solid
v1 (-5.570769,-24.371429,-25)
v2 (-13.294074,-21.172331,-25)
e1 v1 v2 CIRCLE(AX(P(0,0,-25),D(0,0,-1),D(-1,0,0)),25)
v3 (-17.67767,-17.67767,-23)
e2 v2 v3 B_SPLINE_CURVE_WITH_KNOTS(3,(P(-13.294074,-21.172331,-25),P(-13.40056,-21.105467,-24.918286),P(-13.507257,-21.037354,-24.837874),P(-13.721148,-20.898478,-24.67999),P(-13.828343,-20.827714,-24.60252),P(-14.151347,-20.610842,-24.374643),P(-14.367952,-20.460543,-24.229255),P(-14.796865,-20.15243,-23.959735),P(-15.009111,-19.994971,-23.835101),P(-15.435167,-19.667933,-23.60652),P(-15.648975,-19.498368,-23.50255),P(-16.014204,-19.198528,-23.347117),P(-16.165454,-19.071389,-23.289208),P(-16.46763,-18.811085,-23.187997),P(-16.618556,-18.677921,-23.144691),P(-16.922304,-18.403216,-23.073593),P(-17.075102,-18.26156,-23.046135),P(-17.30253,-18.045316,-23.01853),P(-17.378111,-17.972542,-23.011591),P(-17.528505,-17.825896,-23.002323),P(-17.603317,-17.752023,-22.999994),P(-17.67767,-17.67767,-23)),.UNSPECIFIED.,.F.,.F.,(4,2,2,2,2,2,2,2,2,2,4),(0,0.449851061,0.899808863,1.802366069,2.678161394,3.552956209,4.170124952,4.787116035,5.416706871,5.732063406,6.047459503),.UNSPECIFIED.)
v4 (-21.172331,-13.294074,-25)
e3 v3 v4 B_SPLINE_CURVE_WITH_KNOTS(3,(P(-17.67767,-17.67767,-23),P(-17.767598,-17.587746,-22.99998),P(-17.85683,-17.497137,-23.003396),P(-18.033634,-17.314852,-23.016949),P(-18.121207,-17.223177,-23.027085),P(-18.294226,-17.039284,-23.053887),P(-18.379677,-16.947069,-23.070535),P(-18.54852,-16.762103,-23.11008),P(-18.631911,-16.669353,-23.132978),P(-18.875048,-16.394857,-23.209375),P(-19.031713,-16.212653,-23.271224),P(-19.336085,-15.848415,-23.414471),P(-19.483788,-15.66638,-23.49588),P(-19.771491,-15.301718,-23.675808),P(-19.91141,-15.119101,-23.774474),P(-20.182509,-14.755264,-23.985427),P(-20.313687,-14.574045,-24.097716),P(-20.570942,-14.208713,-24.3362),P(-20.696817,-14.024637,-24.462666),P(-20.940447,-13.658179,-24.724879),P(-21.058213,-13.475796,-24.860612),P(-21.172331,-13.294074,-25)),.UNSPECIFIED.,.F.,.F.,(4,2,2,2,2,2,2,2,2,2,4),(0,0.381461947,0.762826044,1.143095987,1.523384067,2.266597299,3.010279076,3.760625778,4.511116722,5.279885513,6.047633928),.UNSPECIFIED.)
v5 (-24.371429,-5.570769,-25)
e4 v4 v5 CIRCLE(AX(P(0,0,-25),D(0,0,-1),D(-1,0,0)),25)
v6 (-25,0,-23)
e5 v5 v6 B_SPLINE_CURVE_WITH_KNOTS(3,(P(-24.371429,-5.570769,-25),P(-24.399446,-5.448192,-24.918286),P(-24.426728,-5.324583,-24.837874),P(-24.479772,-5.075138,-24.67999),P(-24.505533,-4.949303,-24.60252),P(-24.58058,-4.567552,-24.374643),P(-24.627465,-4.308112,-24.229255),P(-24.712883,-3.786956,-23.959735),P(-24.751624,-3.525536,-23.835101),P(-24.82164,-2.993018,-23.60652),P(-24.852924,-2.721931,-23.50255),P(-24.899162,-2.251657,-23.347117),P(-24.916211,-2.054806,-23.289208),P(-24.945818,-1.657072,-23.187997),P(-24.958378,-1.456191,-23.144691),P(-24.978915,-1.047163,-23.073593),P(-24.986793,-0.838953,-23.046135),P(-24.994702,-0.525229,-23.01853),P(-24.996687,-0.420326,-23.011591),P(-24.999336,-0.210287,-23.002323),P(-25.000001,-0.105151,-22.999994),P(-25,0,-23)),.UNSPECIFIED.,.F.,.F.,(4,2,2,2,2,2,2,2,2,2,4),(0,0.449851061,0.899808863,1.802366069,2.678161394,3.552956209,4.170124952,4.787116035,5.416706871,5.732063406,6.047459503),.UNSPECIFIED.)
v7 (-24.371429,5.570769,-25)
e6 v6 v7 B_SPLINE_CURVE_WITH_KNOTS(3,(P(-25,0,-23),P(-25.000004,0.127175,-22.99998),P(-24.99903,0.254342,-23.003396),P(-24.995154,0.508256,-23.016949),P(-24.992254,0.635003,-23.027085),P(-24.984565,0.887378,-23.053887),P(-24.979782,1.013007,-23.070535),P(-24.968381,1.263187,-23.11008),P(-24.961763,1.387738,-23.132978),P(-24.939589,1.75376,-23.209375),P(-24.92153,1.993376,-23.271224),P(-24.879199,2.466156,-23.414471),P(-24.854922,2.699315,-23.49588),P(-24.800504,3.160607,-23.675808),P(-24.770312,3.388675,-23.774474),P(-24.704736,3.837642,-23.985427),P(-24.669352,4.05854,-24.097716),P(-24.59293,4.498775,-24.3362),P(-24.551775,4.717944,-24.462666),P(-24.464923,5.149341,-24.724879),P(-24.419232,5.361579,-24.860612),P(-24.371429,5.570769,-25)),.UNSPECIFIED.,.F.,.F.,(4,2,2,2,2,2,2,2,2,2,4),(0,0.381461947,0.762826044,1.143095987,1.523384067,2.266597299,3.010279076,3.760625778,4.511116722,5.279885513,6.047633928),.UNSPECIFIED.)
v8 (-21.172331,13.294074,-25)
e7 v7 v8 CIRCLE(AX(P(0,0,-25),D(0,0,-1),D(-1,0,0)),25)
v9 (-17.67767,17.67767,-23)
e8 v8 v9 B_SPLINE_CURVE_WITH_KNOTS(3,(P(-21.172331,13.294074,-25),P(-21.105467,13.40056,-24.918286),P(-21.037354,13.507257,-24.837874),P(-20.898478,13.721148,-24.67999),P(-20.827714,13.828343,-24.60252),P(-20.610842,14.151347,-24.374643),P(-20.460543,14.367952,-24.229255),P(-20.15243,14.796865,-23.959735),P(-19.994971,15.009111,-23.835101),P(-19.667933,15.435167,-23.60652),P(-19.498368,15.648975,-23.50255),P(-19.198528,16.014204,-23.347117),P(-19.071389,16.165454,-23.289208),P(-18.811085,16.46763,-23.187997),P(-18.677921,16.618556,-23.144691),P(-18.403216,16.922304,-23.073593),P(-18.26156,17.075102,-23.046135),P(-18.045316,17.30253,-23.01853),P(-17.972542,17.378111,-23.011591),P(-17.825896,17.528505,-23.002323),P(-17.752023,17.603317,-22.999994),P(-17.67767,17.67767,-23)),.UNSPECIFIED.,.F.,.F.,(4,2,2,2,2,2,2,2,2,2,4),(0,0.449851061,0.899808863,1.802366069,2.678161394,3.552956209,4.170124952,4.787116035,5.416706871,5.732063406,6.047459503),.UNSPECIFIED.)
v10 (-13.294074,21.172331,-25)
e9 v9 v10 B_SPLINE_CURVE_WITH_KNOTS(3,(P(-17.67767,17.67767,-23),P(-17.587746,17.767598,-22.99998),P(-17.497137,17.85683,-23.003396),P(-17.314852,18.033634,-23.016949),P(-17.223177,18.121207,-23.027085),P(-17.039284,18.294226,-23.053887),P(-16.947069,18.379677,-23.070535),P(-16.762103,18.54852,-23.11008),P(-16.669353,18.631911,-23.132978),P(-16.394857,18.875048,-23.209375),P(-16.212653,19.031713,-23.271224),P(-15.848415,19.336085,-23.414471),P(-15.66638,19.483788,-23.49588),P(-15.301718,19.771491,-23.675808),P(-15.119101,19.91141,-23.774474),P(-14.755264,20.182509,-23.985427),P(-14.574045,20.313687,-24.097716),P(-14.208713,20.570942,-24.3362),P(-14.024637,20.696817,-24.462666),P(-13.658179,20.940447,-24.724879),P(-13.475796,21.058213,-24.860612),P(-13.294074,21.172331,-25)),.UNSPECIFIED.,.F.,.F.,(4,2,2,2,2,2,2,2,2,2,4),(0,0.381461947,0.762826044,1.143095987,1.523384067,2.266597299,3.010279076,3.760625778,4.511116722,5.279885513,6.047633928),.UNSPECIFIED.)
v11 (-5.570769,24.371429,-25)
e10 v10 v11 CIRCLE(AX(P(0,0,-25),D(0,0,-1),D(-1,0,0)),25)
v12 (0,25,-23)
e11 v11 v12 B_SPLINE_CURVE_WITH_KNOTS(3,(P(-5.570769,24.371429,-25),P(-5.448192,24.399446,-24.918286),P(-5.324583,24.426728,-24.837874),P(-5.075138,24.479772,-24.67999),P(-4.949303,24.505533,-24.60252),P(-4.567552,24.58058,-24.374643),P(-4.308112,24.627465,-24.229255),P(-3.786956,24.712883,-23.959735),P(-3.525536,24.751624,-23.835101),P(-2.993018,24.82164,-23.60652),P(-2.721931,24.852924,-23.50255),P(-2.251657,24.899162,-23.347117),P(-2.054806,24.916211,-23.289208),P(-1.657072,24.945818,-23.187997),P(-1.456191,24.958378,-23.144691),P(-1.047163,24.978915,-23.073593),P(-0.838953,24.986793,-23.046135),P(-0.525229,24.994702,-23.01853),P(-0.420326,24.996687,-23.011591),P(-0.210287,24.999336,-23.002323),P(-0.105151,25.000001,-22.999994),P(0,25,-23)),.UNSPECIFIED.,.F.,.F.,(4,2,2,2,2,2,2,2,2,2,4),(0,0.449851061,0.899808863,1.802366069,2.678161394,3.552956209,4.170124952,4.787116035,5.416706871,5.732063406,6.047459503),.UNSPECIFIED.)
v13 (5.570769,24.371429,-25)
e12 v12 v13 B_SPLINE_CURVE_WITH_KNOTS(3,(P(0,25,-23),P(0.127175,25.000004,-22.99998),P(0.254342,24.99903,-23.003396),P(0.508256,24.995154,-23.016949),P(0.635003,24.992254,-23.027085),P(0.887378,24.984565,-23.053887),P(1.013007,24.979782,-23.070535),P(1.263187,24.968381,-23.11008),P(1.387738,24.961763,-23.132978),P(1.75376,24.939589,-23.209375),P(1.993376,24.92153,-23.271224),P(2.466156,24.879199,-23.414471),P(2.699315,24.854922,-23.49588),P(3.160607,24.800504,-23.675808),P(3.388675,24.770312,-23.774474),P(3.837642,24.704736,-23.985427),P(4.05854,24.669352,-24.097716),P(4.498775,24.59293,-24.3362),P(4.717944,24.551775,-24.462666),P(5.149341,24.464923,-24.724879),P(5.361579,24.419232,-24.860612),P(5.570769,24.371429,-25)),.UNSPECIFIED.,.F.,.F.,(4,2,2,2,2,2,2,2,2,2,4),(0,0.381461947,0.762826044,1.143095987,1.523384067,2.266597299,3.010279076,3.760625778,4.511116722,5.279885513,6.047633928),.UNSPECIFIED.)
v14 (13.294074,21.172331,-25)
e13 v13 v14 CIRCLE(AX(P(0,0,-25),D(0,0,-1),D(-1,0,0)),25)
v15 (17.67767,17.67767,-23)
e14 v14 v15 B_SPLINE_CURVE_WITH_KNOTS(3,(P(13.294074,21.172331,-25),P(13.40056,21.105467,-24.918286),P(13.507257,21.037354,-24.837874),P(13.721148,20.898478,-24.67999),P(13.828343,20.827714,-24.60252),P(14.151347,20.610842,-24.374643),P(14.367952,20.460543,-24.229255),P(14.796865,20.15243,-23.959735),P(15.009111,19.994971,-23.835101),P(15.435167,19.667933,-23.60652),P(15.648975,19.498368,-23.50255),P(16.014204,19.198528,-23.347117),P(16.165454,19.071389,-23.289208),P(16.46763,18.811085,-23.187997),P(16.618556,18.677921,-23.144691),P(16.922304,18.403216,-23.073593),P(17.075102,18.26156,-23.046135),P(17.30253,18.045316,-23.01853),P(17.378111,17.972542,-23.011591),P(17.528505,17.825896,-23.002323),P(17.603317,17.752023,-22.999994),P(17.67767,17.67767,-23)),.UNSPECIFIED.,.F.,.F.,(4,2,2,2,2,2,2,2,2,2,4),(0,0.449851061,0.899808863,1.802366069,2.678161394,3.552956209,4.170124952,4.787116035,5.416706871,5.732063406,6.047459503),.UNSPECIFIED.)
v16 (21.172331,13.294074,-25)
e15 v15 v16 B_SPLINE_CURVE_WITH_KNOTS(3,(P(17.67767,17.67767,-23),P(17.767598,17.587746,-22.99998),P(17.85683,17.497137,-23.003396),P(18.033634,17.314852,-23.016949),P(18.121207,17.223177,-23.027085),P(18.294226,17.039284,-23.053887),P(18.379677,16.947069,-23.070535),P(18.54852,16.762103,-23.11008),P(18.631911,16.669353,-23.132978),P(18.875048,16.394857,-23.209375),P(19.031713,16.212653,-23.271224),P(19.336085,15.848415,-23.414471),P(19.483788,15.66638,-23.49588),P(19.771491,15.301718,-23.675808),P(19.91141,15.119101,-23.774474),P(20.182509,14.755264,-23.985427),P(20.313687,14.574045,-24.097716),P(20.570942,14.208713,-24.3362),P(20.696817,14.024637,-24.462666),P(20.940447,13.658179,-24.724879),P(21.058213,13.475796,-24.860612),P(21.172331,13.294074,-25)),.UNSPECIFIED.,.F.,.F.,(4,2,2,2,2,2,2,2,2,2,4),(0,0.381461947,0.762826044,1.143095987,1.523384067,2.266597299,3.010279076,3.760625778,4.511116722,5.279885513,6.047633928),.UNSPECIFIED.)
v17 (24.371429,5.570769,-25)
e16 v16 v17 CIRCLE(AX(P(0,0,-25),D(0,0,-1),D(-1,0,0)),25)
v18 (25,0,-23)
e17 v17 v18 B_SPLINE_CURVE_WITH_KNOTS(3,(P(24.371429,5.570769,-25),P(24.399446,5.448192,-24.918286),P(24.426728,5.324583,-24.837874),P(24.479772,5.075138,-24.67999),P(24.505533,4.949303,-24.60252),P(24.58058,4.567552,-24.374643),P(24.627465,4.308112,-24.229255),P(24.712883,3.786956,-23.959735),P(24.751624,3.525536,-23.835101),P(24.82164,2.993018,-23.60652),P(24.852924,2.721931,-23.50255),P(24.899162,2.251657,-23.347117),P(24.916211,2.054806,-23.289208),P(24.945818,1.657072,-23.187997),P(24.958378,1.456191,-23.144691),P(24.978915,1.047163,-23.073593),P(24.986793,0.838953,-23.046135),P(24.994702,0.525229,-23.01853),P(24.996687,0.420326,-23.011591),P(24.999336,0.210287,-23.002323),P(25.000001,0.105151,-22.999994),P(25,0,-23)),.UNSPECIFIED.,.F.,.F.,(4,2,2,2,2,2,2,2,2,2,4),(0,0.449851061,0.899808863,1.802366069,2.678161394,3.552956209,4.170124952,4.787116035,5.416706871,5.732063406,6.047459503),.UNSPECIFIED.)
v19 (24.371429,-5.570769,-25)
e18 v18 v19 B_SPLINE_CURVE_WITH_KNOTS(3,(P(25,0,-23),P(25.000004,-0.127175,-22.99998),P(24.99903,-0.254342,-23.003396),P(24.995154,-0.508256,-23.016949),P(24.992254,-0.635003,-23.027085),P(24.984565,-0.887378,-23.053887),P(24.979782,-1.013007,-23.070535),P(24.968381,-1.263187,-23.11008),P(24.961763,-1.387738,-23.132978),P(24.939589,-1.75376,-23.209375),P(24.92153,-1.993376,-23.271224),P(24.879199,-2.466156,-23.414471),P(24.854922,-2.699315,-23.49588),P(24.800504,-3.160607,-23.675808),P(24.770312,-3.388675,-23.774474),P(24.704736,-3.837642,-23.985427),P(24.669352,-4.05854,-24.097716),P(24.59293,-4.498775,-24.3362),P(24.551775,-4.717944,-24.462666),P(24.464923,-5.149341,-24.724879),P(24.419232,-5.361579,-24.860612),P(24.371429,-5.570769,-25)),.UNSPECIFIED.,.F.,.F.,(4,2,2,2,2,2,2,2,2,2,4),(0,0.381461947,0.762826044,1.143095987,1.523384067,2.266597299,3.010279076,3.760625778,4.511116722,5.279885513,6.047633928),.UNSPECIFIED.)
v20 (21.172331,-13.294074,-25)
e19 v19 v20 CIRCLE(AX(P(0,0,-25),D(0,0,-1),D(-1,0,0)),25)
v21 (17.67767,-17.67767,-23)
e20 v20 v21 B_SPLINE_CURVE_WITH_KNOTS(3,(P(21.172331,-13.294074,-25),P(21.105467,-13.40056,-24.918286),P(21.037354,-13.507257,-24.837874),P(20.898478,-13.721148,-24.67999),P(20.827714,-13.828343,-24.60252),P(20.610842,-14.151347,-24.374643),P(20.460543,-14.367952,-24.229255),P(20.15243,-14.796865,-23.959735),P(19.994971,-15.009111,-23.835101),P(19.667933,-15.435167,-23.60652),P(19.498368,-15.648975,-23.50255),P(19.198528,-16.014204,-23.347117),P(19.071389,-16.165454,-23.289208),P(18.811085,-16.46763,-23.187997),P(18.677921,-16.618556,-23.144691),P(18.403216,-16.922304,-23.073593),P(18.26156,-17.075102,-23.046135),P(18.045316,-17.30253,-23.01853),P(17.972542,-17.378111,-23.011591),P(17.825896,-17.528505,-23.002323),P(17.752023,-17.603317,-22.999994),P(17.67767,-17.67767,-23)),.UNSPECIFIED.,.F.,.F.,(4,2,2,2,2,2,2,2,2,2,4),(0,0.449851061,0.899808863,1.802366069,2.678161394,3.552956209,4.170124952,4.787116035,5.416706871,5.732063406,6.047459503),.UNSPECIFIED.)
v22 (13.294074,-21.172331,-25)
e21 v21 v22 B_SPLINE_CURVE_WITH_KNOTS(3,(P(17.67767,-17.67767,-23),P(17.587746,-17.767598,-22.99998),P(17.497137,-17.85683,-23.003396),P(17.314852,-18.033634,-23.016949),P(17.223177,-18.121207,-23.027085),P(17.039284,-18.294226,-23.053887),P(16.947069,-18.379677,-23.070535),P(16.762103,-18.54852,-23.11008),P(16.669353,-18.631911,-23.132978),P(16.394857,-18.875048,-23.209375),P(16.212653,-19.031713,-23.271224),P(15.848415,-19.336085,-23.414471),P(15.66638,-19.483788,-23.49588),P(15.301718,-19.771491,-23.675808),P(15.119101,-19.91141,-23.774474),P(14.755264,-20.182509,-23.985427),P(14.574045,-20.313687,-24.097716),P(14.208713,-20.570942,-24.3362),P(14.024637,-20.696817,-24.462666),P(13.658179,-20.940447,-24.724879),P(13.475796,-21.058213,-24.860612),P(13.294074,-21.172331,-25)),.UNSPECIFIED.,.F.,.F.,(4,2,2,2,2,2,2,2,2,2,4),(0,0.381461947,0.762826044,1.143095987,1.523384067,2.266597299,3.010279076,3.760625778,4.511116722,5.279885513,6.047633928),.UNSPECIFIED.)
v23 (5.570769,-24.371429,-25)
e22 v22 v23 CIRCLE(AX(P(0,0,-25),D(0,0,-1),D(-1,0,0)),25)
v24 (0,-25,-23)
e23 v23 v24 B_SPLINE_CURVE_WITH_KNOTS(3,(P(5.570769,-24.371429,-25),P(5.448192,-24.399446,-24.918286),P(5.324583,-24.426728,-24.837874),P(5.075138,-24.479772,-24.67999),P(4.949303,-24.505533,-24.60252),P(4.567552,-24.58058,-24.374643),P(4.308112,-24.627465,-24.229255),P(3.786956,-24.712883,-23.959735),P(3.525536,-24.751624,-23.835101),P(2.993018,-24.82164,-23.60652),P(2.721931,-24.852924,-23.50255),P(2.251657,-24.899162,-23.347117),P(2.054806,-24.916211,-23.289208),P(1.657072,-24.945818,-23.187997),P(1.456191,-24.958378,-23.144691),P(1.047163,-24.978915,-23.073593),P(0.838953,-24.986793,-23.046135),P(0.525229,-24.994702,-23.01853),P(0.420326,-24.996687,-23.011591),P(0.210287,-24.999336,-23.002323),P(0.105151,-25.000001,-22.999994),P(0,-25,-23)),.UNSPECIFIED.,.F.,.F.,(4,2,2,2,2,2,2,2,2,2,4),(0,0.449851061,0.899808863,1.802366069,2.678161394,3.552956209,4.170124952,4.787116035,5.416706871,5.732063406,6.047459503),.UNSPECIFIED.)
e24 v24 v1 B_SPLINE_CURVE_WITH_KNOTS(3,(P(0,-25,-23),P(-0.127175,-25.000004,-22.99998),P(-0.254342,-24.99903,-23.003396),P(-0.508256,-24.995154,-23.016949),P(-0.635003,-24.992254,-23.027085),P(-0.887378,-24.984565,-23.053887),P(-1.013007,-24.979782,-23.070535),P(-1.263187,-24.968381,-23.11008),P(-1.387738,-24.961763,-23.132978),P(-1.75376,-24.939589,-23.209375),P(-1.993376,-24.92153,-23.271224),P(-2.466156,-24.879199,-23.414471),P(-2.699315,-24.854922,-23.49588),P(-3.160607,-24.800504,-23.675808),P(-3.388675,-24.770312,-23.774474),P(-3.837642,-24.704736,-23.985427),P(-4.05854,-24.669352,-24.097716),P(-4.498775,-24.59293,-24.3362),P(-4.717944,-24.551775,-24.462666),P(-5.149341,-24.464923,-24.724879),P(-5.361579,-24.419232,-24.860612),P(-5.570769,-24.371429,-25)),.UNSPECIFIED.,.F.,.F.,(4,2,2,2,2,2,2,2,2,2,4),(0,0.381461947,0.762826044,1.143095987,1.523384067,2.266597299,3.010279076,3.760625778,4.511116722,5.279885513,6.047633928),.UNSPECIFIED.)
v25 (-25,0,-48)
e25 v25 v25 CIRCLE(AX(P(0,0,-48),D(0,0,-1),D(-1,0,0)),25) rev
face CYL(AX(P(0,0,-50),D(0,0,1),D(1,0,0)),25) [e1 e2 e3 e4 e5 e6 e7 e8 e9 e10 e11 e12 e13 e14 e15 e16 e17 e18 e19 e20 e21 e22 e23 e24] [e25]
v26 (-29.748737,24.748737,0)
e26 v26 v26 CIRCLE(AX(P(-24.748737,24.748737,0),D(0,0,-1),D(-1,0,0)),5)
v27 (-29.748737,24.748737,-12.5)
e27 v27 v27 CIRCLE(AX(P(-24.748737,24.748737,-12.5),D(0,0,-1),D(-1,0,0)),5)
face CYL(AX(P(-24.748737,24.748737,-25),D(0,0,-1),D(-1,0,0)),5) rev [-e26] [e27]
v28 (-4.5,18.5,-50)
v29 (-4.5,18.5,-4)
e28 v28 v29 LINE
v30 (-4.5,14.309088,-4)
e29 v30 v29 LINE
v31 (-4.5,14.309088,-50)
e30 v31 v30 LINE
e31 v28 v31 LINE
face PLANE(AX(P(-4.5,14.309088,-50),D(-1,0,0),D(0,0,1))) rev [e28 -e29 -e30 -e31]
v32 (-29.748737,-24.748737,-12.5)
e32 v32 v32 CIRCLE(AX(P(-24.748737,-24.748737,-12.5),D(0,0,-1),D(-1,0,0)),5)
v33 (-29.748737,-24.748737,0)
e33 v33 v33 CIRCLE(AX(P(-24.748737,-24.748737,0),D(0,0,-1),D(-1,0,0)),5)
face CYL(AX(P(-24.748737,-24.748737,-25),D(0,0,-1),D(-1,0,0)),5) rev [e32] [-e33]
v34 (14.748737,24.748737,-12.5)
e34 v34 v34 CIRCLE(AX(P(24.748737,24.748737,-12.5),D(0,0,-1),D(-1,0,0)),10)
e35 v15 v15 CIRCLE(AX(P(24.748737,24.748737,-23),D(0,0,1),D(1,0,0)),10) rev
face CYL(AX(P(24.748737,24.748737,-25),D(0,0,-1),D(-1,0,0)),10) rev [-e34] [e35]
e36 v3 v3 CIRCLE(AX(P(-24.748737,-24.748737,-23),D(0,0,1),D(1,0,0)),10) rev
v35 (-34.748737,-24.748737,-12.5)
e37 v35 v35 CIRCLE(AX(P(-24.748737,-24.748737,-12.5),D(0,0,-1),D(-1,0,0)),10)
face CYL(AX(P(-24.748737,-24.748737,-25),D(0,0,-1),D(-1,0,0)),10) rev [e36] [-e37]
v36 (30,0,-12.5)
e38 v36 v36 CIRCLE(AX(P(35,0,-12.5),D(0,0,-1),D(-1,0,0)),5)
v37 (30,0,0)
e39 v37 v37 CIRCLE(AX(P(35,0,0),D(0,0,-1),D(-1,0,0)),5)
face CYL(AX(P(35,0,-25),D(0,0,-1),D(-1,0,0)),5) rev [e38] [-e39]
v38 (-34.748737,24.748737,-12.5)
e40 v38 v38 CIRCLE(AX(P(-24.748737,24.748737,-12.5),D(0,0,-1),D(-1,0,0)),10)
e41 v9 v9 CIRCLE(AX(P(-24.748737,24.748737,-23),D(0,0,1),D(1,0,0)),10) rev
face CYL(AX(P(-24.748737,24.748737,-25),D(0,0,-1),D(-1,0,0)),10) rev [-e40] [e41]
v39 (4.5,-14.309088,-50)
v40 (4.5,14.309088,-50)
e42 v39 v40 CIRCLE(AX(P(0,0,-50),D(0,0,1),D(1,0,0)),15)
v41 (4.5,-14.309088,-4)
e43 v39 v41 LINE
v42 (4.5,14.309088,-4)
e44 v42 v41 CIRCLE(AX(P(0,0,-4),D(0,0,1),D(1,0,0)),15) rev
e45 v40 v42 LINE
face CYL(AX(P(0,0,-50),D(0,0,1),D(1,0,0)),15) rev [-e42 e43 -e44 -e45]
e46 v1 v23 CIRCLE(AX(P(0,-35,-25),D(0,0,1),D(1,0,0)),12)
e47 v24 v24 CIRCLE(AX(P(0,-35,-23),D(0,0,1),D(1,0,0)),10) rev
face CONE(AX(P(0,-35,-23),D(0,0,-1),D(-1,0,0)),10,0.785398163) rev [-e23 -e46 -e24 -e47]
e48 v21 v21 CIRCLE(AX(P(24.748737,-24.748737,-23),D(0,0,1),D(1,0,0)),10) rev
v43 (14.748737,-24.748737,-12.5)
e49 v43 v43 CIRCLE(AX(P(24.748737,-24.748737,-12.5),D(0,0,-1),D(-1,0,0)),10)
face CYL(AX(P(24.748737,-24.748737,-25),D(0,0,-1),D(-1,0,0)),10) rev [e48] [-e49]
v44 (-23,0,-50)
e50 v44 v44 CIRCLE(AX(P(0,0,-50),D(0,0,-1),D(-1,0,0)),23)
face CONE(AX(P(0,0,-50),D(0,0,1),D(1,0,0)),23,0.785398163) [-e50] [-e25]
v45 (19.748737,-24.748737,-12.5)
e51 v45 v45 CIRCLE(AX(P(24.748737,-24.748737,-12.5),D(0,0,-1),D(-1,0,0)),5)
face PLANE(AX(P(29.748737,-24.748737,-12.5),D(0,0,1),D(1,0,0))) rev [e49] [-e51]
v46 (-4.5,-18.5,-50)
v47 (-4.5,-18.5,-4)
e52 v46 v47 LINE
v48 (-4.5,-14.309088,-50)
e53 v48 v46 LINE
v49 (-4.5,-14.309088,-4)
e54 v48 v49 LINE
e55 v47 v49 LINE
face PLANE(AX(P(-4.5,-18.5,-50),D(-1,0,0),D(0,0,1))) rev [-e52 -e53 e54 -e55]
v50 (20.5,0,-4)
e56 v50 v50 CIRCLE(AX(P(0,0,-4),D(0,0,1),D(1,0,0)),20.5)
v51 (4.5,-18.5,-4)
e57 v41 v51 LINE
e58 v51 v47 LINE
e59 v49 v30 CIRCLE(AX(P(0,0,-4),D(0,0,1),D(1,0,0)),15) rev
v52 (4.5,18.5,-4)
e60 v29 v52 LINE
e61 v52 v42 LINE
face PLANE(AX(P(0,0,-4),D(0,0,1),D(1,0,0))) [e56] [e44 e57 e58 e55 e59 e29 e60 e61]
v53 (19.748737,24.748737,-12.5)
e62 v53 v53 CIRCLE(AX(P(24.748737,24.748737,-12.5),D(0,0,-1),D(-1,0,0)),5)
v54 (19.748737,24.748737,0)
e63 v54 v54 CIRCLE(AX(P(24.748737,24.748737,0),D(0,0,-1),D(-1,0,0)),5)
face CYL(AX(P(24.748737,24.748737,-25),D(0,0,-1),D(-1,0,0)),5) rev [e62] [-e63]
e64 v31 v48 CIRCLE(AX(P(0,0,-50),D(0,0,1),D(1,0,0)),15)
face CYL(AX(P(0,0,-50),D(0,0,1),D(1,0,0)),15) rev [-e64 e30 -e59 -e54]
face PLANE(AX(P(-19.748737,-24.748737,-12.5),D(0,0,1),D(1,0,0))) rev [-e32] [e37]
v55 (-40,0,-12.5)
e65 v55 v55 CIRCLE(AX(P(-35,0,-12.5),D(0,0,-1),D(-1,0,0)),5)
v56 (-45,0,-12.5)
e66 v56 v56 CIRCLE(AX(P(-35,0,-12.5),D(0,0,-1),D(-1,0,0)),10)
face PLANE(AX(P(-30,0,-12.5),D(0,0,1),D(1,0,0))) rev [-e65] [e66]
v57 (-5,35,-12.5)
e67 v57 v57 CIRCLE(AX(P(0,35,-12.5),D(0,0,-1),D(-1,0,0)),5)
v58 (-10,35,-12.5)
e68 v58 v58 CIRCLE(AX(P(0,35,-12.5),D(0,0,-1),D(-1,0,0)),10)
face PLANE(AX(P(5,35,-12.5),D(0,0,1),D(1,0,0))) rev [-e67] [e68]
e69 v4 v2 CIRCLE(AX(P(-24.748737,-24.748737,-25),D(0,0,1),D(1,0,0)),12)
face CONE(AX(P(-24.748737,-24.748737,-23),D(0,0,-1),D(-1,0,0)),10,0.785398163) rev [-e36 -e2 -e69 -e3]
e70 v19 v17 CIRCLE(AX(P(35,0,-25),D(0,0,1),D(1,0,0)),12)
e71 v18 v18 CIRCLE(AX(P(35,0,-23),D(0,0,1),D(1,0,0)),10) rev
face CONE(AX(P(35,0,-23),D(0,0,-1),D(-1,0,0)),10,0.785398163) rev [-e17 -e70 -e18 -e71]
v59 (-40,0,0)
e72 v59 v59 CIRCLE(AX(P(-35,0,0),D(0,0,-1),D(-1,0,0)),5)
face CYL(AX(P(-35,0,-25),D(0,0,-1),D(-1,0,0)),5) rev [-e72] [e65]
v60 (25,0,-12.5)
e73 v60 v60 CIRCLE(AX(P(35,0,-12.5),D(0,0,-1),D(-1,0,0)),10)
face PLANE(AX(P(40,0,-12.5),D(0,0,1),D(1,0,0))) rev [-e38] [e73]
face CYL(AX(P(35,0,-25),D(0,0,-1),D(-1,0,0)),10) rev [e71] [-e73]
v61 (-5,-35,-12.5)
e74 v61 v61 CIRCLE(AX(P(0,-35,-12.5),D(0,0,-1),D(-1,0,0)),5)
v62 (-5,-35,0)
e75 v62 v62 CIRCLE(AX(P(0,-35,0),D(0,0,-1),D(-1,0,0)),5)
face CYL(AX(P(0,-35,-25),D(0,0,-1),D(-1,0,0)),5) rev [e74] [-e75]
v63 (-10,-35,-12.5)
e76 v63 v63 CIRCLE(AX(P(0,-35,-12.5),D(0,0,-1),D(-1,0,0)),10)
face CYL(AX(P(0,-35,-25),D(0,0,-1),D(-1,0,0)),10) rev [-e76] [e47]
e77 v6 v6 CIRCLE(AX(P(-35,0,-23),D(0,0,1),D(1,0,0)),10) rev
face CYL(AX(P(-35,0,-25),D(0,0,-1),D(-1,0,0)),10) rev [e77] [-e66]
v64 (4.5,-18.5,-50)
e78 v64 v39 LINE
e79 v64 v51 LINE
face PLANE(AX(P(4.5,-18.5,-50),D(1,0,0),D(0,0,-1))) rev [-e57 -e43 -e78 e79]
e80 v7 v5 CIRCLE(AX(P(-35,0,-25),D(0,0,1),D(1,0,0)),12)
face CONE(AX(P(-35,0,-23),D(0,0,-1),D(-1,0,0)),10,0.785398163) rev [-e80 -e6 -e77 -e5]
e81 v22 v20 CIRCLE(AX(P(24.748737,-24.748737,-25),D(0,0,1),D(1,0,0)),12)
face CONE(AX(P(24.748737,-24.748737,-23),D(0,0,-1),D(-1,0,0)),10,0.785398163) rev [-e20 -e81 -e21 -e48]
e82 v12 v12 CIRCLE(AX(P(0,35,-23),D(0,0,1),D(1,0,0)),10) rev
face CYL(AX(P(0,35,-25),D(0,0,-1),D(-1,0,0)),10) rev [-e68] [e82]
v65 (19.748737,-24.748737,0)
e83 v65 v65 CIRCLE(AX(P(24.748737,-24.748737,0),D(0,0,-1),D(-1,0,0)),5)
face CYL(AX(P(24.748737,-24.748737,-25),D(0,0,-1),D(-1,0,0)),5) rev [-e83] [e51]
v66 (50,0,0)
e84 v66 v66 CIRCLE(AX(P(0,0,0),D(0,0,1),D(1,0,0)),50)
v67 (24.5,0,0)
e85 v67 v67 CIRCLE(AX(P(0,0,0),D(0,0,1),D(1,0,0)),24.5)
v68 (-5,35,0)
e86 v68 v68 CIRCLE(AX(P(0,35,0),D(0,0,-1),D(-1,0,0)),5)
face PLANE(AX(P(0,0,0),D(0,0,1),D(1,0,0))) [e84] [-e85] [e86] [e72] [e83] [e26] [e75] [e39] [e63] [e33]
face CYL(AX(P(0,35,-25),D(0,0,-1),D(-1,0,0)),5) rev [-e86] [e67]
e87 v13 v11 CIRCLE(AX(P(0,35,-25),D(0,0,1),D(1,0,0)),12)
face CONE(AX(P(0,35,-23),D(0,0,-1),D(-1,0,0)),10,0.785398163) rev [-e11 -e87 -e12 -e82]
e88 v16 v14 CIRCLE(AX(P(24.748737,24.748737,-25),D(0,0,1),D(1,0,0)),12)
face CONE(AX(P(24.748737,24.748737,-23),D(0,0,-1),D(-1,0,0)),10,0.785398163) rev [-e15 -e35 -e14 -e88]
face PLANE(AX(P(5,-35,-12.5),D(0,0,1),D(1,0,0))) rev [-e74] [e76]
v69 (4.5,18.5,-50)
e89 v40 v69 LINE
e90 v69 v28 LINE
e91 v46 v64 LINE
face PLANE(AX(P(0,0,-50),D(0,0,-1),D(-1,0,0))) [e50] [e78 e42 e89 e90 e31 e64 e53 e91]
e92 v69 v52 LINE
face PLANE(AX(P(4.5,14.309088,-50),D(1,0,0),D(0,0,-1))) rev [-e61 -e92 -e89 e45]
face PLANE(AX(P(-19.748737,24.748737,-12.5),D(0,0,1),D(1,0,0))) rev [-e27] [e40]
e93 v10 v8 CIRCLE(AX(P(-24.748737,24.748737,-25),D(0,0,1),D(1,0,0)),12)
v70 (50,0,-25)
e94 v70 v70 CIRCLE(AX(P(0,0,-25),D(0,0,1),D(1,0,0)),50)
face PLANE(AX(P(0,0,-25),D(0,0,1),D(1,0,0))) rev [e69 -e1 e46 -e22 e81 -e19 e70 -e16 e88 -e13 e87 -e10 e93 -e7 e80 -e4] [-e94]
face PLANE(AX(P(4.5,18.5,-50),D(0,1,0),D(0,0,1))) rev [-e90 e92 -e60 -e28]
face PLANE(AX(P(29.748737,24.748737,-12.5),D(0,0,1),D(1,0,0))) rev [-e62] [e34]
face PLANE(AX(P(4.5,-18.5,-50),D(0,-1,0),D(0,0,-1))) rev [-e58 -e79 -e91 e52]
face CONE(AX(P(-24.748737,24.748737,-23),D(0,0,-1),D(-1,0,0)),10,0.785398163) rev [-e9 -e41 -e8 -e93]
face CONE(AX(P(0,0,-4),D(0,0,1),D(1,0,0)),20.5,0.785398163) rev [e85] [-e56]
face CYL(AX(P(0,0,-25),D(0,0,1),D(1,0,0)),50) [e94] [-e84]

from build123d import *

# Parameters (mm, degrees)
SKETCH1_R                                = 50
BOSS_EXTRUDE1_DEPTH                      = 25
CBORE_FOR_M10_HEX_HEAD_BOLT1_D           = 10
CBORE_FOR_M10_HEX_HEAD_BOLT1_CBORE_D     = 20
CBORE_FOR_M10_HEX_HEAD_BOLT1_CBORE_DEPTH = 12.5
SKETCH5_R                                = 25
BOSS_EXTRUDE2_DEPTH                      = 25
CHAMFER1_SIZE                            = 2
CUT_EXTRUDE1_DEPTH                       = 87.602540436
SKETCH9_R                                = 24.5
CUT_EXTRUDE2_DEPTH                       = 4
CHAMFER2_SIZE                            = 4
CHAMFER3_SIZE                            = 2


# Some blends are built 0.0001 mm under size
with BuildPart() as part:
    # Sketch1 → Boss-Extrude1 (new body)
    with BuildSketch(Plane.XY):
        Circle(SKETCH1_R)
    extrude(amount=-BOSS_EXTRUDE1_DEPTH)

    # CBORE for M10 Hex Head Bolt1 (through all)
    with Locations(Plane(origin=(0, 0, -25), x_dir=(-1, 0, 0), z_dir=(0, 0, -1))):
        with Locations((-24.748737342, 24.748737342), (0, 35), (24.748737342, 24.748737342), (35, 0), (24.748737342, -24.748737342), (0, -35), (-24.748737342, -24.748737342), (-35, 0)):
            CounterBoreHole(CBORE_FOR_M10_HEX_HEAD_BOLT1_D / 2, CBORE_FOR_M10_HEX_HEAD_BOLT1_CBORE_D / 2, CBORE_FOR_M10_HEX_HEAD_BOLT1_CBORE_DEPTH)

    # Sketch5 → Boss-Extrude2 (add)
    with BuildSketch(Plane(origin=(0, 0, -25), x_dir=(-1, 0, 0), z_dir=(0, 0, -1))):
        with Locations(Location((0, 0, 0), (0, 0, 180))):
            Circle(SKETCH5_R)
    extrude(amount=BOSS_EXTRUDE2_DEPTH)

    # Chamfer1
    # the kernel refuses this chamfer: 2 mm, written as the material it takes off along each edge
    with BuildSketch(Plane(origin=(24.748737342, 24.748737342, -25), x_dir=(-1, 0, 0), z_dir=(0, -1, 0))) as chamfer1_piece_1_section:
        Polygon((10 + CHAMFER1_SIZE, 0), (10, -CHAMFER1_SIZE), (10, 0), align=None)
    chamfer1_piece_1 = revolve(axis=Axis((24.748737342, 24.748737342, -25), (0, 0, -1)), revolution_arc=315.000000416, mode=Mode.PRIVATE)
    chamfer1_piece_1 = chamfer1_piece_1 - Plane(origin=(0, 0, -24.034020629), x_dir=(1, 0, 0), z_dir=(0, 0, 1)) * Cylinder(25, 48, mode=Mode.PRIVATE)
    add(chamfer1_piece_1, mode=Mode.SUBTRACT)
    with BuildSketch(Plane(origin=(35, 0, -25), x_dir=(-1, 0, 0), z_dir=(0, -1, 0))) as chamfer1_piece_2_section:
        Polygon((10 + CHAMFER1_SIZE, 0), (10, -CHAMFER1_SIZE), (10, 0), align=None)
    chamfer1_piece_2 = revolve(axis=Axis((35, 0, -25), (0, 0, -1)), mode=Mode.PRIVATE)
    chamfer1_piece_2 = chamfer1_piece_2 - Plane(origin=(0, 0, -24.035090303), x_dir=(1, 0, 0), z_dir=(0, 0, 1)) * Cylinder(25, 48, mode=Mode.PRIVATE)
    add(chamfer1_piece_2, mode=Mode.SUBTRACT)
    with BuildSketch(Plane(origin=(24.748737342, -24.748737342, -25), x_dir=(-1, 0, 0), z_dir=(0, -1, 0))) as chamfer1_piece_3_section:
        Polygon((10 + CHAMFER1_SIZE, 0), (10, -CHAMFER1_SIZE), (10, 0), align=None)
    chamfer1_piece_3 = revolve(axis=Axis((24.748737342, -24.748737342, -25), (0, 0, -1)), revolution_arc=44.999998935, mode=Mode.PRIVATE)
    chamfer1_piece_3 = chamfer1_piece_3 - Plane(origin=(0, 0, -24.295051561), x_dir=(1, 0, 0), z_dir=(0, 0, 1)) * Cylinder(25, 48, mode=Mode.PRIVATE)
    add(chamfer1_piece_3, mode=Mode.SUBTRACT)
    with BuildSketch(Plane(origin=(0, -35, -25), x_dir=(-1, 0, 0), z_dir=(0, -1, 0))) as chamfer1_piece_4_section:
        Polygon((10 + CHAMFER1_SIZE, 0), (10, -CHAMFER1_SIZE), (10, 0), align=None)
    chamfer1_piece_4 = revolve(axis=Axis((0, -35, -25), (0, 0, -1)), revolution_arc=90.00000015, mode=Mode.PRIVATE)
    chamfer1_piece_4 = chamfer1_piece_4 - Plane(origin=(0, 0, -24.021368021), x_dir=(1, 0, 0), z_dir=(0, 0, 1)) * Cylinder(25, 48, mode=Mode.PRIVATE)
    add(chamfer1_piece_4, mode=Mode.SUBTRACT)
    with BuildSketch(Plane(origin=(-24.748737342, -24.748737342, -25), x_dir=(0.7071067835812739, 0.7071067787918212, 0), z_dir=(-0.7071067787918212, 0.7071067835812739, 0))) as chamfer1_piece_5_section:
        Polygon((10 + CHAMFER1_SIZE, 0), (10, -CHAMFER1_SIZE), (10, 0), align=None)
    chamfer1_piece_5 = revolve(axis=Axis((-24.748737342, -24.748737342, -25), (0, 0, -1)), revolution_arc=224.999999806, mode=Mode.PRIVATE)
    chamfer1_piece_5 = chamfer1_piece_5 - Plane(origin=(0, 0, -24.030194299), x_dir=(1, 0, 0), z_dir=(0, 0, 1)) * Cylinder(25, 49, mode=Mode.PRIVATE)
    add(chamfer1_piece_5, mode=Mode.SUBTRACT)
    with BuildSketch(Plane(origin=(-35, 0, -25), x_dir=(-1, 0, 0), z_dir=(0, -1, 0))) as chamfer1_piece_6_section:
        Polygon((10 + CHAMFER1_SIZE, 0), (10, -CHAMFER1_SIZE), (10, 0), align=None)
    chamfer1_piece_6 = revolve(axis=Axis((-35, 0, -25), (0, 0, -1)), revolution_arc=180.000000155, mode=Mode.PRIVATE)
    chamfer1_piece_6 = chamfer1_piece_6 - Plane(origin=(0, 0, -24.027851375), x_dir=(1, 0, 0), z_dir=(0, 0, 1)) * Cylinder(25, 48, mode=Mode.PRIVATE)
    add(chamfer1_piece_6, mode=Mode.SUBTRACT)
    with BuildSketch(Plane(origin=(-24.748737342, 24.748737342, -25), x_dir=(-1, 0, 0), z_dir=(0, -1, 0))) as chamfer1_piece_7_section:
        Polygon((10 + CHAMFER1_SIZE, 0), (10, -CHAMFER1_SIZE), (10, 0), align=None)
    chamfer1_piece_7 = revolve(axis=Axis((-24.748737342, 24.748737342, -25), (0, 0, -1)), revolution_arc=225.000000551, mode=Mode.PRIVATE)
    chamfer1_piece_7 = chamfer1_piece_7 - Plane(origin=(0, 0, -24.030194347), x_dir=(1, 0, 0), z_dir=(0, 0, 1)) * Cylinder(25, 48, mode=Mode.PRIVATE)
    add(chamfer1_piece_7, mode=Mode.SUBTRACT)
    with BuildSketch(Plane(origin=(0, 35, -25), x_dir=(-1, 0, 0), z_dir=(0, -1, 0))) as chamfer1_piece_8_section:
        Polygon((10 + CHAMFER1_SIZE, 0), (10, -CHAMFER1_SIZE), (10, 0), align=None)
    chamfer1_piece_8 = revolve(axis=Axis((0, 35, -25), (0, 0, -1)), revolution_arc=269.999999979, mode=Mode.PRIVATE)
    chamfer1_piece_8 = chamfer1_piece_8 - Plane(origin=(0, 0, -24.032221046), x_dir=(1, 0, 0), z_dir=(0, 0, 1)) * Cylinder(25, 48, mode=Mode.PRIVATE)
    add(chamfer1_piece_8, mode=Mode.SUBTRACT)
    with BuildSketch(Plane(origin=(0, 35, -25), x_dir=(3.7419774552245994e-10, -1.0, 0), z_dir=(1.0, 3.7419774552245994e-10, 0))) as chamfer1_piece_9_section:
        Polygon((10 + CHAMFER1_SIZE, 0), (10, -CHAMFER1_SIZE), (10, 0), align=None)
    chamfer1_piece_9 = revolve(axis=Axis((0, 35, -25), (0, 0, -1)), revolution_arc=90.000000021, mode=Mode.PRIVATE)
    chamfer1_piece_9 = chamfer1_piece_9 - Plane(origin=(0, 0, -24.021368016), x_dir=(1, 0, 0), z_dir=(0, 0, 1)) * Cylinder(25, 48, mode=Mode.PRIVATE)
    add(chamfer1_piece_9, mode=Mode.SUBTRACT)
    with BuildSketch(Plane(origin=(-24.748737342, 24.748737342, -25), x_dir=(0.7071067743839492, -0.7071067879891458, 0), z_dir=(0.7071067879891458, 0.7071067743839492, 0))) as chamfer1_piece_10_section:
        Polygon((10 + CHAMFER1_SIZE, 0), (10, -CHAMFER1_SIZE), (10, 0), align=None)
    chamfer1_piece_10 = revolve(axis=Axis((-24.748737342, 24.748737342, -25), (0, 0, -1)), revolution_arc=134.999999449, mode=Mode.PRIVATE)
    chamfer1_piece_10 = chamfer1_piece_10 - Plane(origin=(0, 0, -24.025029467), x_dir=(1, 0, 0), z_dir=(0, 0, 1)) * Cylinder(25, 48, mode=Mode.PRIVATE)
    add(chamfer1_piece_10, mode=Mode.SUBTRACT)
    with BuildSketch(Plane(origin=(-35, 0, -25), x_dir=(1.0, -2.710294976997066e-09, 0), z_dir=(2.710294976997066e-09, 1.0, 0))) as chamfer1_piece_11_section:
        Polygon((10 + CHAMFER1_SIZE, 0), (10, -CHAMFER1_SIZE), (10, 0), align=None)
    chamfer1_piece_11 = revolve(axis=Axis((-35, 0, -25), (0, 0, -1)), revolution_arc=179.999999845, mode=Mode.PRIVATE)
    chamfer1_piece_11 = chamfer1_piece_11 - Plane(origin=(0, 0, -24.027851322), x_dir=(1, 0, 0), z_dir=(0, 0, 1)) * Cylinder(25, 48, mode=Mode.PRIVATE)
    add(chamfer1_piece_11, mode=Mode.SUBTRACT)
    with BuildSketch(Plane(origin=(-24.748737342, -24.748737342, -25), x_dir=(-1, 0, 0), z_dir=(0, -1, 0))) as chamfer1_piece_12_section:
        Polygon((10 + CHAMFER1_SIZE, 0), (10, -CHAMFER1_SIZE), (10, 0), align=None)
    chamfer1_piece_12 = revolve(axis=Axis((-24.748737342, -24.748737342, -25), (0, 0, -1)), revolution_arc=135.000000194, mode=Mode.PRIVATE)
    chamfer1_piece_12 = chamfer1_piece_12 - Plane(origin=(0, 0, -24.025029447), x_dir=(1, 0, 0), z_dir=(0, 0, 1)) * Cylinder(25, 48, mode=Mode.PRIVATE)
    add(chamfer1_piece_12, mode=Mode.SUBTRACT)
    with BuildSketch(Plane(origin=(0, -35, -25), x_dir=(2.620144484540633e-09, 1.0, 0), z_dir=(-1.0, 2.620144484540633e-09, 0))) as chamfer1_piece_13_section:
        Polygon((10 + CHAMFER1_SIZE, 0), (10, -CHAMFER1_SIZE), (10, 0), align=None)
    chamfer1_piece_13 = revolve(axis=Axis((0, -35, -25), (0, 0, -1)), revolution_arc=269.99999985, mode=Mode.PRIVATE)
    chamfer1_piece_13 = chamfer1_piece_13 - Plane(origin=(0, 0, -24.032221078), x_dir=(1, 0, 0), z_dir=(0, 0, 1)) * Cylinder(25, 48, mode=Mode.PRIVATE)
    add(chamfer1_piece_13, mode=Mode.SUBTRACT)
    with BuildSketch(Plane(origin=(24.748737342, -24.748737342, -25), x_dir=(-0.707106794329391, 0.7071067680437038, 0), z_dir=(-0.7071067680437038, -0.707106794329391, 0))) as chamfer1_piece_14_section:
        Polygon((10 + CHAMFER1_SIZE, 0), (10, -CHAMFER1_SIZE), (10, 0), align=None)
    chamfer1_piece_14 = revolve(axis=Axis((24.748737342, -24.748737342, -25), (0, 0, -1)), revolution_arc=315.000001065, mode=Mode.PRIVATE)
    chamfer1_piece_14 = chamfer1_piece_14 - Plane(origin=(0, 0, -24.034020657), x_dir=(1, 0, 0), z_dir=(0, 0, 1)) * Cylinder(25, 49, mode=Mode.PRIVATE)
    add(chamfer1_piece_14, mode=Mode.SUBTRACT)
    with BuildSketch(Plane(origin=(24.748737342, 24.748737342, -25), x_dir=(-0.7071067863158467, -0.7071067760572484, 0), z_dir=(0.7071067760572484, -0.7071067863158467, 0))) as chamfer1_piece_15_section:
        Polygon((10 + CHAMFER1_SIZE, 0), (10, -CHAMFER1_SIZE), (10, 0), align=None)
    chamfer1_piece_15 = revolve(axis=Axis((24.748737342, 24.748737342, -25), (0, 0, -1)), revolution_arc=44.999999584, mode=Mode.PRIVATE)
    chamfer1_piece_15 = chamfer1_piece_15 - Plane(origin=(0, 0, -24.295051641), x_dir=(1, 0, 0), z_dir=(0, 0, 1)) * Cylinder(25, 48, mode=Mode.PRIVATE)
    add(chamfer1_piece_15, mode=Mode.SUBTRACT)

    # Sketch8 → Cut-Extrude1 (cut, through all)
    with BuildSketch(Plane.XY):
        with BuildLine():
            Line((-4.5, 14.309088021), (-4.5, 18.5))
            Line((-4.5, 18.5), (4.5, 18.5))
            Line((4.5, 18.5), (4.5, 14.309088021))
            ThreePointArc((4.5, 14.309088021), (15, 0), (4.5, -14.309088021))
            Line((4.5, -14.309088021), (4.5, -18.5))
            Line((4.5, -18.5), (-4.5, -18.5))
            Line((-4.5, -18.5), (-4.5, -14.309088021))
            ThreePointArc((-4.5, -14.309088021), (-15, 0), (-4.5, 14.309088021))
        make_face()
    extrude(amount=-CUT_EXTRUDE1_DEPTH, mode=Mode.SUBTRACT)

    # Sketch9 → Cut-Extrude2 (cut)
    with BuildSketch(Plane.XY):
        Circle(SKETCH9_R)
    extrude(amount=-CUT_EXTRUDE2_DEPTH, mode=Mode.SUBTRACT)

    # Chamfer2
    chamfer2_edges = [part.edges().sort_by_distance(p)[0] for p in [
        (-24.5, 0, -4),
    ]]
    chamfer(chamfer2_edges, length=CHAMFER2_SIZE - 0.0001)  # a hair under: the kernel refuses the full size

    # Chamfer3
    chamfer3_edges = [part.edges().sort_by_distance(p)[0] for p in [
        (-25, 0, -50),
    ]]
    chamfer(chamfer3_edges, length=CHAMFER3_SIZE)


solid = part.part
